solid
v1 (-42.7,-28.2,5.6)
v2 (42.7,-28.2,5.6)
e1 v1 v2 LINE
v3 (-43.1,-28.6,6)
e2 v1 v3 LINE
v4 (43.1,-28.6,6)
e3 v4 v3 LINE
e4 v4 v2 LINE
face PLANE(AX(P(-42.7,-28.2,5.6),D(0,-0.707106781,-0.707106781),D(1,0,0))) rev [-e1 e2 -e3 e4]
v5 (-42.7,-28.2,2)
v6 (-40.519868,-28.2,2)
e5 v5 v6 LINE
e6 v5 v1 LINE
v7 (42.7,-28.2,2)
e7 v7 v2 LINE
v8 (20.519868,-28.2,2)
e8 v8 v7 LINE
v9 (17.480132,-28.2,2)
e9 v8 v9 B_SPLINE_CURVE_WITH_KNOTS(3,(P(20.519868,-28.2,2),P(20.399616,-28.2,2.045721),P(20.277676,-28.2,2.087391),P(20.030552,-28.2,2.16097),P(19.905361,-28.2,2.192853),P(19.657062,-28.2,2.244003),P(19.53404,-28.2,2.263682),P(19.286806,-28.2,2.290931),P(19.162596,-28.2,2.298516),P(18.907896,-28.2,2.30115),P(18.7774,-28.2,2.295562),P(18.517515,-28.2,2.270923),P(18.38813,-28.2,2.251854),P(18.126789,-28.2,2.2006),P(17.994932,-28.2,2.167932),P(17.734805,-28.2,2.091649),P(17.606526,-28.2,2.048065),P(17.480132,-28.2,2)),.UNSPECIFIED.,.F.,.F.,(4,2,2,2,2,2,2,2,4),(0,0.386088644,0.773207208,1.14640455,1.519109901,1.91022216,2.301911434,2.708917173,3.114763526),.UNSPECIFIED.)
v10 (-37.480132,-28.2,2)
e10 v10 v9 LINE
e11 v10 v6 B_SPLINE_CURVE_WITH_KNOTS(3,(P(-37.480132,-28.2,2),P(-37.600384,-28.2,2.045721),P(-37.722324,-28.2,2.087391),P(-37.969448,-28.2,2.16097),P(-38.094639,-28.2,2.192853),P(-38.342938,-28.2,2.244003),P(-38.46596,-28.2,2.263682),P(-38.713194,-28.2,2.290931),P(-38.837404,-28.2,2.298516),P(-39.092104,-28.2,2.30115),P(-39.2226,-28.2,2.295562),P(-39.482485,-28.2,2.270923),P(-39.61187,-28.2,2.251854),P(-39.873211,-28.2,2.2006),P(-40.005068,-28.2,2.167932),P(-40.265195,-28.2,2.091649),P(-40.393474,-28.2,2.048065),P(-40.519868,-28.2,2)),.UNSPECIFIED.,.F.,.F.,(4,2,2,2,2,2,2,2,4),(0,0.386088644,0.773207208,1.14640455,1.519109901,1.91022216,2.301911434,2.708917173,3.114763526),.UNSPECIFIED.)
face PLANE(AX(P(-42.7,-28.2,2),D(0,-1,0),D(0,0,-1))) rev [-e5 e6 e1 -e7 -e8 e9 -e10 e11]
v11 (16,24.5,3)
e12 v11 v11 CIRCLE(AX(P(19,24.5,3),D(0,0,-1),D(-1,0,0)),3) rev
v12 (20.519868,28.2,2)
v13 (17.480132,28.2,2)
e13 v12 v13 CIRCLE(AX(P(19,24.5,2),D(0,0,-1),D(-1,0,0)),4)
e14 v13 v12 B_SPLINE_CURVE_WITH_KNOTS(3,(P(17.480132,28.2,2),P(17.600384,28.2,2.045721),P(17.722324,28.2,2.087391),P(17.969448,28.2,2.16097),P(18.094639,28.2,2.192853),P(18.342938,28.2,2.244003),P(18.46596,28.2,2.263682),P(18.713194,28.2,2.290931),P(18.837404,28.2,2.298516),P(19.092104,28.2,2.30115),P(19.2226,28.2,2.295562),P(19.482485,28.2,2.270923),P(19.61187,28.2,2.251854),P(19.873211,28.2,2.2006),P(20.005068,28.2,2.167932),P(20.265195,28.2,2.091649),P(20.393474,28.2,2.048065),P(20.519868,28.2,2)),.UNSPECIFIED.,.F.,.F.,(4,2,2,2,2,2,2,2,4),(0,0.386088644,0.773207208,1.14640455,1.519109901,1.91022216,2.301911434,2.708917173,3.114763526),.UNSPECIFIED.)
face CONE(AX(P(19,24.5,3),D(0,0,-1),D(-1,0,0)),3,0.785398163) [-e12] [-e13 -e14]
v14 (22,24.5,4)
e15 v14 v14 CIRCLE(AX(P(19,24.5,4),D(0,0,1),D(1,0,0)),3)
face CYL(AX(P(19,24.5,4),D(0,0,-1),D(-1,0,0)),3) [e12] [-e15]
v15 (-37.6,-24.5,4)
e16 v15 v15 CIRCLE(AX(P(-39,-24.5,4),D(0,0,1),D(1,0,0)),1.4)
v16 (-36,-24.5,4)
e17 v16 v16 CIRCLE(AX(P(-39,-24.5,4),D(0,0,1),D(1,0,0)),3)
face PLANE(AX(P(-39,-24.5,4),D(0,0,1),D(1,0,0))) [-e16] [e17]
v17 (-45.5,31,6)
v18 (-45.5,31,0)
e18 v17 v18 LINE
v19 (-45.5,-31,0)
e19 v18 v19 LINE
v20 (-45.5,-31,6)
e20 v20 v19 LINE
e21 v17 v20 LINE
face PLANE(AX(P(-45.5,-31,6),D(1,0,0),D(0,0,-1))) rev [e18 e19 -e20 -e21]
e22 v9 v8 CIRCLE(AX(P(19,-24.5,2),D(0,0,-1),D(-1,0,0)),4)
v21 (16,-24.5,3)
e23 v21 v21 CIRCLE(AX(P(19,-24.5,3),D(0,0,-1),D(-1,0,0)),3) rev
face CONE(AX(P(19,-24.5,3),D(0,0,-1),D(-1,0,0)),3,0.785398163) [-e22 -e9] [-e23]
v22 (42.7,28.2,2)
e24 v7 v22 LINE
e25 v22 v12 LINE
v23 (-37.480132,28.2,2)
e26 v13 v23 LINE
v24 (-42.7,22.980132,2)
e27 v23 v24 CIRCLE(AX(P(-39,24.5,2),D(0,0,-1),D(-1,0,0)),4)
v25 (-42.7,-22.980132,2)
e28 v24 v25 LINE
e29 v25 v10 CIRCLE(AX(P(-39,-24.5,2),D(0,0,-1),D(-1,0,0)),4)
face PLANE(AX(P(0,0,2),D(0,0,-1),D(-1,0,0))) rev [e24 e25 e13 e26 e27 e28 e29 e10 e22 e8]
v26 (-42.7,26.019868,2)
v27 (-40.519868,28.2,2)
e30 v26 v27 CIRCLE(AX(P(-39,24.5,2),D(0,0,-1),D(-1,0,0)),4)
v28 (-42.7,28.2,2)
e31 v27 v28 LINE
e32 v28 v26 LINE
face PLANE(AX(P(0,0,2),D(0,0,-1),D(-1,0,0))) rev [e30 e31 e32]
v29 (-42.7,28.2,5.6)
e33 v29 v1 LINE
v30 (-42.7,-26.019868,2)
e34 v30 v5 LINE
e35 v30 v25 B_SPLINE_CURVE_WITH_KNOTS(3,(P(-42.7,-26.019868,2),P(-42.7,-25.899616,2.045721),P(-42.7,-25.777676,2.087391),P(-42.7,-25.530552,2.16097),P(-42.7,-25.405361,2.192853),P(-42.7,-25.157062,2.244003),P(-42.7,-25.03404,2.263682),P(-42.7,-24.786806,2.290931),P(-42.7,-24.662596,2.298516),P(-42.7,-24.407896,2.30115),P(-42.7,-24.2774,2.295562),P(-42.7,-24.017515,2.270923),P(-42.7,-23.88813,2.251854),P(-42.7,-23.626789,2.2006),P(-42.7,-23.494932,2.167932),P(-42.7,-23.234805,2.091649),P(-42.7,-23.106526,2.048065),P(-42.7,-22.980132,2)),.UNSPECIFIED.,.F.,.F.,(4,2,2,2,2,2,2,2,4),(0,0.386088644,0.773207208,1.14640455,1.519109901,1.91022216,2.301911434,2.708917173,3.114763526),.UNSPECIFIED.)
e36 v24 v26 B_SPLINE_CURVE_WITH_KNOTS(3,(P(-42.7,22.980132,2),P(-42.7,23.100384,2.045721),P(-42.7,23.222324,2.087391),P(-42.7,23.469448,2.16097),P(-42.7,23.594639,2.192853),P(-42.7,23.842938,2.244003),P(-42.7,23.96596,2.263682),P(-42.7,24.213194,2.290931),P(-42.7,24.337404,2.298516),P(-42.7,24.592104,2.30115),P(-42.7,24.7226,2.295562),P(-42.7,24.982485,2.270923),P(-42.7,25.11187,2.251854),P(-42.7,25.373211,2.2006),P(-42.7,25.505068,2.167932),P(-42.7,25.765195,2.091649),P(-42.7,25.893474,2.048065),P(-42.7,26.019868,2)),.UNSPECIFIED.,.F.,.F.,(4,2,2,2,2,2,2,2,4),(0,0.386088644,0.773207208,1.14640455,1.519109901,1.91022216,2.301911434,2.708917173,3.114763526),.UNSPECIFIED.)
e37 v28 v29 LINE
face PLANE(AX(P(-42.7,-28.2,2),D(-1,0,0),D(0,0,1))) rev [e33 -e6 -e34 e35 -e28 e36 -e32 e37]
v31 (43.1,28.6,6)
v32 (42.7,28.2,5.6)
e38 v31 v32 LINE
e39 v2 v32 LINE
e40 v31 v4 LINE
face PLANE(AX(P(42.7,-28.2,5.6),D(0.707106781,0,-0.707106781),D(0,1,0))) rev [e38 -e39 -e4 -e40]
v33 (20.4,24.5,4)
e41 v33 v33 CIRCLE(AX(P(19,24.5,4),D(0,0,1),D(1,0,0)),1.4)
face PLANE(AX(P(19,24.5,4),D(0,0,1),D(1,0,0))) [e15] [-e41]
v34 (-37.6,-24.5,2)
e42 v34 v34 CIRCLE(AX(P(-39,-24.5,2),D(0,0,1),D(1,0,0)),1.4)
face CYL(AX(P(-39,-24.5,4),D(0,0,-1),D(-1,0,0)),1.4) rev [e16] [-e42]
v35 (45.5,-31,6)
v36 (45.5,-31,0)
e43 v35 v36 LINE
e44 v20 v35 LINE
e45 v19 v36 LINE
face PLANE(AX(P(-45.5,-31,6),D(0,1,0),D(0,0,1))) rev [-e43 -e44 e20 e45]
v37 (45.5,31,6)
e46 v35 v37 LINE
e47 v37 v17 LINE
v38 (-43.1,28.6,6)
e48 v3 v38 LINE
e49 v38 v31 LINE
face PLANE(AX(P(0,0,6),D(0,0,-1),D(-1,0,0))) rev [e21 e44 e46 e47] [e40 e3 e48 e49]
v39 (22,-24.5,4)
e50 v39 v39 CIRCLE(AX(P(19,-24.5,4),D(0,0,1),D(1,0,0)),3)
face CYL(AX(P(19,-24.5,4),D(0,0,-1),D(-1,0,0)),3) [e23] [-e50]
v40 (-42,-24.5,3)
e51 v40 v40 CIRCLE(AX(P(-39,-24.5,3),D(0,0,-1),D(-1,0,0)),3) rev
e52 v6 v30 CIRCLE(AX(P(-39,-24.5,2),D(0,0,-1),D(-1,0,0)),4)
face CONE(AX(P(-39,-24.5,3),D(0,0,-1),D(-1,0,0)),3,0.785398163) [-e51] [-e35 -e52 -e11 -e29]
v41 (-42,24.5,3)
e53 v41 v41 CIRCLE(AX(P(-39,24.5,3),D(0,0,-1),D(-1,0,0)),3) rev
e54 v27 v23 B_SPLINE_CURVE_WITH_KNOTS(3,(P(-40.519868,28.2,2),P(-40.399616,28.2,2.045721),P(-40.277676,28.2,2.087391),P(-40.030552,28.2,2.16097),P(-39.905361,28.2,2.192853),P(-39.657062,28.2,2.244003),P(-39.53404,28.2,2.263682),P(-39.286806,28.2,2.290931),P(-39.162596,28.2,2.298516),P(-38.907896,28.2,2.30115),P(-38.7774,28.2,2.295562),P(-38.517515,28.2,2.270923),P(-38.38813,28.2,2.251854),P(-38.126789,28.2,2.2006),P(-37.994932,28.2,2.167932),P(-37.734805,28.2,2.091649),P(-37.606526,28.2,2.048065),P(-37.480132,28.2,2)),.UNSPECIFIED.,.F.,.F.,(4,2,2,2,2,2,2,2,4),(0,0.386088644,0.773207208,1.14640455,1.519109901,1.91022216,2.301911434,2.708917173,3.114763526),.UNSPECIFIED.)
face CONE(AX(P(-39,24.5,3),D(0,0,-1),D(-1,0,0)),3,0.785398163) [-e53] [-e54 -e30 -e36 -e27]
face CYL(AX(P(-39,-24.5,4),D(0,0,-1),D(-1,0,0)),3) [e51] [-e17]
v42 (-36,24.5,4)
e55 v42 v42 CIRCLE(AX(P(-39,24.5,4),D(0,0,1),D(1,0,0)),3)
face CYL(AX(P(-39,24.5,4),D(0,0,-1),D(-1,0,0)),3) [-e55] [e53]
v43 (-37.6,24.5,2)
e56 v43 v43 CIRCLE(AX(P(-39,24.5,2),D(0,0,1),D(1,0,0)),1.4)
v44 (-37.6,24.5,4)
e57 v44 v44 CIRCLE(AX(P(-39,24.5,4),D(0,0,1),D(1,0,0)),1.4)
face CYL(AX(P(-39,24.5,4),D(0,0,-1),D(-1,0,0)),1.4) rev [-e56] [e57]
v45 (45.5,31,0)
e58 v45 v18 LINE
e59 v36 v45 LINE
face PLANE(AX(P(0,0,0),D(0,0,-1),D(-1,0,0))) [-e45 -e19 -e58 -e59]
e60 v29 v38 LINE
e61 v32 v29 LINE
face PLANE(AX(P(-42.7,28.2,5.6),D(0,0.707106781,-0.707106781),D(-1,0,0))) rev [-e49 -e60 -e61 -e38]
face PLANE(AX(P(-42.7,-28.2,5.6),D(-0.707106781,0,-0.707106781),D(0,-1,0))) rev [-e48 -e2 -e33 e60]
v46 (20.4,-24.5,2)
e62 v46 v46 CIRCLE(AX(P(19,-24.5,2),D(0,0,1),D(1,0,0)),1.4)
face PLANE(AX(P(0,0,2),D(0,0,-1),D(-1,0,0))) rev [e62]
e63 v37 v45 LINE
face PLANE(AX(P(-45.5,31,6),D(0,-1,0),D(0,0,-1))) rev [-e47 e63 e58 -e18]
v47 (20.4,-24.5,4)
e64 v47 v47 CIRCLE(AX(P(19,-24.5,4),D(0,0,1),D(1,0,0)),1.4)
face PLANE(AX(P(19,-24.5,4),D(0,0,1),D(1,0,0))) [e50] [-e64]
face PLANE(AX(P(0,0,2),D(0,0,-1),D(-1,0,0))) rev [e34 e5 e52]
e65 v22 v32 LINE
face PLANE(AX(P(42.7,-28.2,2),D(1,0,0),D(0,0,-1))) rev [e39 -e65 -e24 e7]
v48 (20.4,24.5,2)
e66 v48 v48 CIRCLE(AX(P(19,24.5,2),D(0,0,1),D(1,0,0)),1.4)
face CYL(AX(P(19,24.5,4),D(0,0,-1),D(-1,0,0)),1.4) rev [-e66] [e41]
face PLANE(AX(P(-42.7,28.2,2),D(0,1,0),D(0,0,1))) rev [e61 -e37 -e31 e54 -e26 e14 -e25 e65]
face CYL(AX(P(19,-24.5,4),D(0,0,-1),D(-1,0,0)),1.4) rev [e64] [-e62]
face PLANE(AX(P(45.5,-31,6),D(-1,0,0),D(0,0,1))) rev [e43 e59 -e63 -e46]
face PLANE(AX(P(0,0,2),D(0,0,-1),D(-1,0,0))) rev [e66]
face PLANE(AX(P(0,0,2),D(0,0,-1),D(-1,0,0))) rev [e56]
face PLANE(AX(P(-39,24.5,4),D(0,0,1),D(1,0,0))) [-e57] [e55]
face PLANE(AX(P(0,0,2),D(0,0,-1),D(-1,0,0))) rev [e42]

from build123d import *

# Parameters (mm, degrees)
SKETCH1_W                  = 91
SKETCH1_H                  = 62
BOSS_EXTRUDE1_DEPTH        = 6
SKETCH2_W                  = 85.4
SKETCH2_H                  = 56.4
CUT_EXTRUDE1_DEPTH         = 4
SKETCH3_R                  = 3
SKETCH3_R_2                = 1.4
BOSS_EXTRUDE2_DEPTH        = 2
CHAMFER1_SIZE              = 1
CHAMFER2_SIZE              = 0.4
LPATTERN1_COUNT            = 2
LPATTERN1_PITCH            = 58
LPATTERN1_COUNT_DIR2       = 2
LPATTERN1_PITCH_DIR2       = 49
CHAMFER1_OF_LPATTERN1_SIZE = 1


with BuildPart() as part:
    # Sketch1 → Boss-Extrude1 (new body)
    with BuildSketch(Plane.XY):
        Rectangle(SKETCH1_W, SKETCH1_H)
    extrude(amount=BOSS_EXTRUDE1_DEPTH)

    # Sketch2 → Cut-Extrude1 (cut)
    with BuildSketch(Plane.XY.offset(6)):
        Rectangle(SKETCH2_W, SKETCH2_H)
    extrude(amount=-CUT_EXTRUDE1_DEPTH, mode=Mode.SUBTRACT)

    # Sketch3 → Boss-Extrude2 (add)
    with BuildSketch(Plane.XY.offset(2)):
        with Locations(Location((-39, 24.5, 0), (0, 0, 180))):
            Circle(SKETCH3_R)
        with Locations((-39, 24.5)):
            Circle(SKETCH3_R_2, mode=Mode.SUBTRACT)
    boss_extrude2 = extrude(amount=BOSS_EXTRUDE2_DEPTH)

    # Chamfer1
    # the kernel refuses this chamfer: 1 mm, written as the material it adds along each edge
    with BuildSketch(Plane(origin=(-39, 24.5, 2), x_dir=(-1, 0, 0), z_dir=(0, 1, 0))) as chamfer1_piece_1:
        Polygon((3 + CHAMFER1_SIZE, 0), (3, CHAMFER1_SIZE), (3, 0), align=None)
    revolve(axis=Axis((-39, 24.5, 2), (0, 0, 1)))

    # Chamfer2
    chamfer2_edges = [part.edges().sort_by_distance(p)[0] for p in [
        (42.7, 0, 6),
        (0, 28.2, 6),
        (-42.7, 0, 6),
        (0, -28.2, 6),
    ]]
    chamfer(chamfer2_edges, length=CHAMFER2_SIZE)

    # LPattern1: Boss-Extrude2 2 × 2
    with Locations(*[(i * LPATTERN1_PITCH, -j * LPATTERN1_PITCH_DIR2, 0) for i in range(LPATTERN1_COUNT) for j in range(LPATTERN1_COUNT_DIR2) if (i, j) != (0, 0)]):
        add(boss_extrude2)

    # Chamfer1 of LPattern1
    # the kernel refuses this chamfer: 1 mm, written as the material it adds along each edge
    with BuildSketch(Plane(origin=(-39, -24.5, 2), x_dir=(-1, 0, 0), z_dir=(0, 1, 0))) as chamfer1_of_lpattern1_piece_1:
        Polygon((3 + CHAMFER1_OF_LPATTERN1_SIZE, 0), (3, CHAMFER1_OF_LPATTERN1_SIZE), (3, 0), align=None)
    revolve(axis=Axis((-39, -24.5, 2), (0, 0, 1)))
    with BuildSketch(Plane(origin=(19, 24.5, 2), x_dir=(-1, 0, 0), z_dir=(0, 1, 0))) as chamfer1_of_lpattern1_piece_2:
        Polygon((3 + CHAMFER1_OF_LPATTERN1_SIZE, 0), (3, CHAMFER1_OF_LPATTERN1_SIZE), (3, 0), align=None)
    revolve(axis=Axis((19, 24.5, 2), (0, 0, 1)))
    with BuildSketch(Plane(origin=(19, -24.5, 2), x_dir=(-1, 0, 0), z_dir=(0, 1, 0))) as chamfer1_of_lpattern1_piece_3:
        Polygon((3 + CHAMFER1_OF_LPATTERN1_SIZE, 0), (3, CHAMFER1_OF_LPATTERN1_SIZE), (3, 0), align=None)
    revolve(axis=Axis((19, -24.5, 2), (0, 0, 1)))


solid = part.part
